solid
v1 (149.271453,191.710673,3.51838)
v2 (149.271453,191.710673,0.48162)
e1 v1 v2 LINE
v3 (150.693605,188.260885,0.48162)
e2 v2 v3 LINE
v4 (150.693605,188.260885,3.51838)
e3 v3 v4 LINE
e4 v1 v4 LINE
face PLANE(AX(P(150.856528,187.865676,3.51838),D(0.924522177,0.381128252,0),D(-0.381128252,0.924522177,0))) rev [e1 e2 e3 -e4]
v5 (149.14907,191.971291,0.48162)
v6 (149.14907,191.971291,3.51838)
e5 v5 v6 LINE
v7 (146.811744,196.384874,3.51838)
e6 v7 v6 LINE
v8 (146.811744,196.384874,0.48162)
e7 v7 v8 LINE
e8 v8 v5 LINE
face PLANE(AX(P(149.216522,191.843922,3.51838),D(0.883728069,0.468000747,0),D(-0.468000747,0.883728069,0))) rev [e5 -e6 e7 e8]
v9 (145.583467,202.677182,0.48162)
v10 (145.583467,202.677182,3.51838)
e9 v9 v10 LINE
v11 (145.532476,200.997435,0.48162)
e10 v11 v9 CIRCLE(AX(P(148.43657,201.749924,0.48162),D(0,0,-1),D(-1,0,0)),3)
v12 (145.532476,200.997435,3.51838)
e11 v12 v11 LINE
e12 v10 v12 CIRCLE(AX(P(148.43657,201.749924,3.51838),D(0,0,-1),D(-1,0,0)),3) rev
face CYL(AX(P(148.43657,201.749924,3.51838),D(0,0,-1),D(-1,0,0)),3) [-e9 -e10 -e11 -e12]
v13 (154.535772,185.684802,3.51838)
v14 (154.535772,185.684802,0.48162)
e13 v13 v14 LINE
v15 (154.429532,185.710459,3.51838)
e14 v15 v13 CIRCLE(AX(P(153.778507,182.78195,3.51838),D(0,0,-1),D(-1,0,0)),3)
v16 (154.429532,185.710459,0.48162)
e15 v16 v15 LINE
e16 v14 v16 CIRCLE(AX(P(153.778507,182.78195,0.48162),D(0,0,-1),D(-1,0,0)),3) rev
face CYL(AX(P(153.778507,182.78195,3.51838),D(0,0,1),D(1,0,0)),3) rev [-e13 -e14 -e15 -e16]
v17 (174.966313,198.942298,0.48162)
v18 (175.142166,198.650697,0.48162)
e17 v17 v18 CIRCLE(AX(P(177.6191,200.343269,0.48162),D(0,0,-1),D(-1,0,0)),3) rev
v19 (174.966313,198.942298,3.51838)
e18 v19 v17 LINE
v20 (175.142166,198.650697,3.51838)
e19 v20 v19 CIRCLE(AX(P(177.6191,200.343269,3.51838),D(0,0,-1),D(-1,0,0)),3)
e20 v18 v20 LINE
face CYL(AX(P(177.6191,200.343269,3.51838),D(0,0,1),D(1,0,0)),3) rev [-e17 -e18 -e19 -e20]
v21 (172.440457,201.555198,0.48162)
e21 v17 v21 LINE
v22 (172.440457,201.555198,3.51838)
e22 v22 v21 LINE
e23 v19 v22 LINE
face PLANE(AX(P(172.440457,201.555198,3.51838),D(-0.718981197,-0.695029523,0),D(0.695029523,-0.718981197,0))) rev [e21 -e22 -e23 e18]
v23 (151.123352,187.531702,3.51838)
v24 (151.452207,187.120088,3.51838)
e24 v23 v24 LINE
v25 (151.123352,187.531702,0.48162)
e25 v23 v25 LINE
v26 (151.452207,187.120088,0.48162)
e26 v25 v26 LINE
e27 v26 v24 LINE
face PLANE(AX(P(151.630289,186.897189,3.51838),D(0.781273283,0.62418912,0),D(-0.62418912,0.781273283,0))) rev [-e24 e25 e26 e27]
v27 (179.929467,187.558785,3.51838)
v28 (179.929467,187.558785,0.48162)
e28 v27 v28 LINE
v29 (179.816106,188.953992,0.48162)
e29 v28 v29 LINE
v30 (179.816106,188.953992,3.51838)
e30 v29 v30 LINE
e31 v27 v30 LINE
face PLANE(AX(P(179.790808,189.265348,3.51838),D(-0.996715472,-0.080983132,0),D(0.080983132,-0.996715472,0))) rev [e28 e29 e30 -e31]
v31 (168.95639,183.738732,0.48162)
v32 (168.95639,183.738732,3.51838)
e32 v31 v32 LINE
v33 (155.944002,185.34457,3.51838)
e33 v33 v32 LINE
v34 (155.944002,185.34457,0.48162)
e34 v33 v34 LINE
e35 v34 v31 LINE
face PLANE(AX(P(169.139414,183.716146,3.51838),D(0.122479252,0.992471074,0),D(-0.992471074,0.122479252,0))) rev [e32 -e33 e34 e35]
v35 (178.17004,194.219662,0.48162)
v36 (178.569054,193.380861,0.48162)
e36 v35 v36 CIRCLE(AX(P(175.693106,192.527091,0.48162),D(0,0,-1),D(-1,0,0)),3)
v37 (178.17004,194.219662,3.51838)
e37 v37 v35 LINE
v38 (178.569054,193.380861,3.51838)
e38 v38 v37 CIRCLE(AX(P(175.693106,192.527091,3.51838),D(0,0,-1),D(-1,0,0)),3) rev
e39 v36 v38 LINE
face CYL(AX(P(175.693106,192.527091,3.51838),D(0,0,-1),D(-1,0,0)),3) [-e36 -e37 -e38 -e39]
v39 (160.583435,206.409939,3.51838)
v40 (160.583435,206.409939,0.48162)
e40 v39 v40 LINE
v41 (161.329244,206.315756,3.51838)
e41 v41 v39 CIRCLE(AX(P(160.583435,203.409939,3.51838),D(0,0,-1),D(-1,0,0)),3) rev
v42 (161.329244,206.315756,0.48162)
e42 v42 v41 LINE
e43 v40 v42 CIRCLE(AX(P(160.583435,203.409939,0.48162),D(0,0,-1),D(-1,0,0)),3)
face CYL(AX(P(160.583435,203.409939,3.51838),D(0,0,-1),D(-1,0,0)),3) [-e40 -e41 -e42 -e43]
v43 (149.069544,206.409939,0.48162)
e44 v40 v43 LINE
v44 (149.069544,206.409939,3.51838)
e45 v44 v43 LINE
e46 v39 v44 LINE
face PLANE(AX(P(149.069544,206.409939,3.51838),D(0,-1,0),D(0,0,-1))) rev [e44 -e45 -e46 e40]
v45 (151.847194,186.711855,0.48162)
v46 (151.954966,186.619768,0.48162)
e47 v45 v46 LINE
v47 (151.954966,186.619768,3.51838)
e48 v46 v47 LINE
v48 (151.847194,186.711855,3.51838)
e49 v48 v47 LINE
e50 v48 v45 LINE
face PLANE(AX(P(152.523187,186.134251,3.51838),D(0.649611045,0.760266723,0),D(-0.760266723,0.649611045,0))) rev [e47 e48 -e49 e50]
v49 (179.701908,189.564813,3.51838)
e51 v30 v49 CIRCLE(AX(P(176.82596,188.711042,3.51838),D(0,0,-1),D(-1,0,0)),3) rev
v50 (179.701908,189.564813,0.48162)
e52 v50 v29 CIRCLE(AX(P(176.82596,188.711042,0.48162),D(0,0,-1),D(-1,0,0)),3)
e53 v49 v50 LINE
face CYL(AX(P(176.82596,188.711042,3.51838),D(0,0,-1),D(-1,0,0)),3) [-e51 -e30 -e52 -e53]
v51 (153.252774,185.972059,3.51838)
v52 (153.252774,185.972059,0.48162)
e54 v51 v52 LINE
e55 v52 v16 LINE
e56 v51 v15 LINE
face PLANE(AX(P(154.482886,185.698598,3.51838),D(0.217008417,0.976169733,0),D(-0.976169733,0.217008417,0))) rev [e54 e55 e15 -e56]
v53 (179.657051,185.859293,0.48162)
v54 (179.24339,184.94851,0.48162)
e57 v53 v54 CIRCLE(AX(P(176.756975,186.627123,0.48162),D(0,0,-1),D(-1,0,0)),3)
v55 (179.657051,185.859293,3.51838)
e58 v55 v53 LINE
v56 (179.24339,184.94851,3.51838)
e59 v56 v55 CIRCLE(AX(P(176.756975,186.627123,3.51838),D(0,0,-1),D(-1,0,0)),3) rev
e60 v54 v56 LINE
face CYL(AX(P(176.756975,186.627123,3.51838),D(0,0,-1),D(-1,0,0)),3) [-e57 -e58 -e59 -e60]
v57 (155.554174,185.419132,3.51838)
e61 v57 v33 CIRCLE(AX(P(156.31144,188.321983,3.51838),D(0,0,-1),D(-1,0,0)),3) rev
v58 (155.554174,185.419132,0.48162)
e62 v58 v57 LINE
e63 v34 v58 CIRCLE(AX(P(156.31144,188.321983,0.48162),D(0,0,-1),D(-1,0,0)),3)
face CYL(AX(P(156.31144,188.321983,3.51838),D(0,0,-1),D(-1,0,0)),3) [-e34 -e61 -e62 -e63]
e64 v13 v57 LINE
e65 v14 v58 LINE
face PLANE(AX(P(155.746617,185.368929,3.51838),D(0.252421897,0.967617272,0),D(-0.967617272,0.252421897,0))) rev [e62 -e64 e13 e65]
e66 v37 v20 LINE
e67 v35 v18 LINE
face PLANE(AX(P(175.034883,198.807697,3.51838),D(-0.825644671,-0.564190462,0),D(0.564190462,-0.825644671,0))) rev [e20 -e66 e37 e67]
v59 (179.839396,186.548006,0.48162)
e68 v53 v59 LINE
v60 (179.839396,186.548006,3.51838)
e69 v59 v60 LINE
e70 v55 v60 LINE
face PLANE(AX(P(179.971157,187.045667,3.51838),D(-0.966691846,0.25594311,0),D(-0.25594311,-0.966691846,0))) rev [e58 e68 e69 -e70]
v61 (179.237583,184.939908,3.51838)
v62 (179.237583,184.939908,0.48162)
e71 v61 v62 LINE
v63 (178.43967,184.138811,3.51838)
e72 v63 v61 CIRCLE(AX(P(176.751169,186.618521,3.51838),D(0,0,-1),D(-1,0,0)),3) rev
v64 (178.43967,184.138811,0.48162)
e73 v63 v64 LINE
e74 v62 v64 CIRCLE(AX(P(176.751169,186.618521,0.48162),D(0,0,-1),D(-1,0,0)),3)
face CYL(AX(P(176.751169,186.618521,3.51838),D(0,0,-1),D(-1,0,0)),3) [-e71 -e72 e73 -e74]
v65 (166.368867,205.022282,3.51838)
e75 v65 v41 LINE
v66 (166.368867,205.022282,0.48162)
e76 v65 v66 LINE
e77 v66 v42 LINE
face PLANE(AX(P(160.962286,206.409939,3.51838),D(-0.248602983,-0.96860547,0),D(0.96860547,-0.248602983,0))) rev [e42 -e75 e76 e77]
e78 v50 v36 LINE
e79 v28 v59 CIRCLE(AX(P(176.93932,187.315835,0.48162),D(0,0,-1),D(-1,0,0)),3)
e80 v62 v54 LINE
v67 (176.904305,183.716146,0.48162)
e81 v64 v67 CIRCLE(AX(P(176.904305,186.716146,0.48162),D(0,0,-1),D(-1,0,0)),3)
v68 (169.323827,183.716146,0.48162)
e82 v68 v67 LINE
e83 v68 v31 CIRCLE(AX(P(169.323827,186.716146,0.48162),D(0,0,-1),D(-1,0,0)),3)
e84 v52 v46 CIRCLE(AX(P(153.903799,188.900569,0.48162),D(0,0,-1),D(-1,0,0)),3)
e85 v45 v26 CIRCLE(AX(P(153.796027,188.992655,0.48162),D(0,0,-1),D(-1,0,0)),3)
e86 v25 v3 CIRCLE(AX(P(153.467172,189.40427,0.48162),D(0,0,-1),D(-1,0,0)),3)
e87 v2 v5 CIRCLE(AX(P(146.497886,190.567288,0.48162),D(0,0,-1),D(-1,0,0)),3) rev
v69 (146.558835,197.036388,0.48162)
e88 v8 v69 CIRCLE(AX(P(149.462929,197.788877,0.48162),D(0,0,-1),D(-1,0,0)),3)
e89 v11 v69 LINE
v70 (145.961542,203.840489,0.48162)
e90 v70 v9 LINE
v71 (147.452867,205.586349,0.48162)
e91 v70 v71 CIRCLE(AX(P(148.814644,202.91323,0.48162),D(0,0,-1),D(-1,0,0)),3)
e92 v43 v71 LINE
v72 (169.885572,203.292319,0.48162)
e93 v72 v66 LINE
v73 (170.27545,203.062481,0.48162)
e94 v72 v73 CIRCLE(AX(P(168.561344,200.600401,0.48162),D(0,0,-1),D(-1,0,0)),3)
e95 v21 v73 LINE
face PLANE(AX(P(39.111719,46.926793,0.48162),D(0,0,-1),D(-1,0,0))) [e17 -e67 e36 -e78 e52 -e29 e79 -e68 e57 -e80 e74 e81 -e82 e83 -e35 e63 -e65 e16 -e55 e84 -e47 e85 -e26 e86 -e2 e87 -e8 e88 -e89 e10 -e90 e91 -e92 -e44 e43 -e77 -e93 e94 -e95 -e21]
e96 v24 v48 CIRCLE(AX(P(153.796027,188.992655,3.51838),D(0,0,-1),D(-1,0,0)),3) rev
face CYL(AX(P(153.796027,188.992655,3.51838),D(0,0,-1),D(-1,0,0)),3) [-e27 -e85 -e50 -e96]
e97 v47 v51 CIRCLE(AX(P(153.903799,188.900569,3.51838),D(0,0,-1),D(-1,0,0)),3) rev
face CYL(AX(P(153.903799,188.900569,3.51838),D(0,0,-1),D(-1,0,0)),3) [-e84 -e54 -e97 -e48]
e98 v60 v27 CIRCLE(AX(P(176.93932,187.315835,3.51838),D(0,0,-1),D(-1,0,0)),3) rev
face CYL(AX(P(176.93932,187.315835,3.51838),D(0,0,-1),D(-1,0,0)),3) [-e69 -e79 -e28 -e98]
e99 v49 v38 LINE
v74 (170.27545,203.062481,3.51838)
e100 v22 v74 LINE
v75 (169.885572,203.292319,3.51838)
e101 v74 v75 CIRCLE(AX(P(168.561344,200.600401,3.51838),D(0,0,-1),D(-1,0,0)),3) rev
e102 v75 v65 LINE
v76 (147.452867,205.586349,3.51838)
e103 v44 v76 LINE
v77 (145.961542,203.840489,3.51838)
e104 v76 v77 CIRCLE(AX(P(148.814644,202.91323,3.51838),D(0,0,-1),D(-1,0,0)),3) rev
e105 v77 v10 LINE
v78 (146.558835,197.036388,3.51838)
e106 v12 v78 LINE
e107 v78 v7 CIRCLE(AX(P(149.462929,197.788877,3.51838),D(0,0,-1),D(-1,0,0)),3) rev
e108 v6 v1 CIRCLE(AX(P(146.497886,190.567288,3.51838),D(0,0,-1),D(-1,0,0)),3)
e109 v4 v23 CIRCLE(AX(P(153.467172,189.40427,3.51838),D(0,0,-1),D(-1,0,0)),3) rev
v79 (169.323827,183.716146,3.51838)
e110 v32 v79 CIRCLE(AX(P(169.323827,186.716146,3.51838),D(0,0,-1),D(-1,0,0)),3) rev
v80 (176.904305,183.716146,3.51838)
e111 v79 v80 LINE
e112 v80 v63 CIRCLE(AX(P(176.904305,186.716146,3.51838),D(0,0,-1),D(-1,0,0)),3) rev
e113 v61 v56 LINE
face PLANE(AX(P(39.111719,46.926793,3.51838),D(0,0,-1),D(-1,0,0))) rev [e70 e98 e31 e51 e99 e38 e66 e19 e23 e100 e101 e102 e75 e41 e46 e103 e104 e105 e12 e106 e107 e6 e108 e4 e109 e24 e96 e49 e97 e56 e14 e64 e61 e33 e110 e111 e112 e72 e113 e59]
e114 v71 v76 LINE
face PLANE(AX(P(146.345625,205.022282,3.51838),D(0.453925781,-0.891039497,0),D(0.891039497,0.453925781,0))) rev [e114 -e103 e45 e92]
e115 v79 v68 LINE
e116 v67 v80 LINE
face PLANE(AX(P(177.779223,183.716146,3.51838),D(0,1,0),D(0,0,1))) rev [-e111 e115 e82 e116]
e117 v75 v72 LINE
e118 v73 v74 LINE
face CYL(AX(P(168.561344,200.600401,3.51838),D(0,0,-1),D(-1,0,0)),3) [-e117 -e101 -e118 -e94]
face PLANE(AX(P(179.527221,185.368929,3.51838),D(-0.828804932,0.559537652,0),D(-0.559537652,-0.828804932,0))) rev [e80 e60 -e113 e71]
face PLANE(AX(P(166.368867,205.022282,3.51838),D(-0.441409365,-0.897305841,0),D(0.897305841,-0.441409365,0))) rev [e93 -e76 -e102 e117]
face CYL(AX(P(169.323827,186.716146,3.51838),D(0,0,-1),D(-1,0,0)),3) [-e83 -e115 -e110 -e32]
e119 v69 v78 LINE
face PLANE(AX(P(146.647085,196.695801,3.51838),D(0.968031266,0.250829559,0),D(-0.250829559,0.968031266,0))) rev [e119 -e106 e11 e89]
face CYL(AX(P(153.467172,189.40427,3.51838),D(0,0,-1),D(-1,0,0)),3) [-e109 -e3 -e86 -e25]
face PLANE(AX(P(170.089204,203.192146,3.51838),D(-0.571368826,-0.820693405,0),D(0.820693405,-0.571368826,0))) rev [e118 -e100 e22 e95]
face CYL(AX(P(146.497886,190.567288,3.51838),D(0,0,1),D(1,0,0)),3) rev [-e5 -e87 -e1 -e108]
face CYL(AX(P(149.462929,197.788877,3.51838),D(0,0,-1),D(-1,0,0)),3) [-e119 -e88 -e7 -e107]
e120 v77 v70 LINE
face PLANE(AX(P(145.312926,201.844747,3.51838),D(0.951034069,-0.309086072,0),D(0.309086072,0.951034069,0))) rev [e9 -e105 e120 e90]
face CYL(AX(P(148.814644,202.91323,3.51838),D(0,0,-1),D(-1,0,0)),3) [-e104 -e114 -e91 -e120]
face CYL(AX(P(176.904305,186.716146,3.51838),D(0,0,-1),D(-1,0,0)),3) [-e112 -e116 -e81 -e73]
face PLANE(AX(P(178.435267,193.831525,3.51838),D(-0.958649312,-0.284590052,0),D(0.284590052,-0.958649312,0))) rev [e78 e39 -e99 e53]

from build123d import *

# Parameters (mm, degrees)
BOSS_EXTRUDE1_DEPTH = 4
SCALE4_SCALE        = 0.75919
FILLET6_R           = 3
FILLET7_R           = 3


with BuildPart() as part:
    # Sketch1 → Boss-Extrude1 (new body)
    with BuildSketch(Plane.XY):
        Polygon((139.887521377, 204.056894723), (141.24778548, 208.242322731), (144.835713473, 210.070135105), (160.500754315, 210.070135105), (167.622266071, 208.242322731), (172.522669487, 205.831679823), (175.619724447, 203.675502319), (178.946764591, 200.233807794), (179.037084843, 200.056512483), (183.5160481, 193.501931379), (185.301557704, 187.487393826), (185.539112291, 184.563645059), (184.954362538, 182.355057305), (184.113784767, 181.109966828), (182.651910383, 180.178021908), (181.232301611, 180.178021908), (171.271612606, 180.178021908), (153.63070922, 182.355057305), (151.966131288, 182.789295026), (149.384829279, 183.363134026), (148.208709289, 184.36807152), (147.189516356, 185.643755739), (145.029311699, 190.88387399), (141.644867129, 197.274737006), align=None)
    extrude(amount=BOSS_EXTRUDE1_DEPTH)


with BuildPart() as part_1:
    # Scale4: scaled about (162.417336375, 194.870616826, 2)
    add(part.part.scale(SCALE4_SCALE).moved(Location((39.111718772, 46.926793238, 0.48162))))

    # Fillet6
    # the kernel refuses this fillet: 3 mm, written as the material it adds along each edge
    with BuildSketch(Plane(origin=(175.034883215, 198.80769695, 0.48162), x_dir=(0.5641904622979087, -0.8256446706980383, 0), z_dir=(0, 0, 1))) as fillet6_piece_1_section:
        with BuildLine():
            CenterArc((FILLET6_R * 0.0642311981219, FILLET6_R), FILLET6_R, 262.649743959, 7.350256041)
            Line((-FILLET6_R * 0.063703385216, FILLET6_R * 0.00821739156901), (0, 0))
            Line((0, 0), (FILLET6_R * 0.0642311981219, 0))
        make_face()
    fillet6_piece_1 = extrude(amount=3.03676, mode=Mode.PRIVATE)
    fillet6_piece_1 = split(fillet6_piece_1, bisect_by=Plane(origin=(175.064317261, 198.840916135, 2), z_dir=(-0.7189811970622167, -0.6950295233088893, 0)), keep=Keep.TOP, mode=Mode.PRIVATE)
    add(fillet6_piece_1)
    with BuildSketch(Plane(origin=(154.482885985, 185.698598128, 0.48162), x_dir=(-0.9761697325769959, 0.21700841734954968, 0), z_dir=(0, 0, 1))) as fillet6_piece_2:
        with BuildLine():
            CenterArc((FILLET6_R * 0.0182188067452, FILLET6_R), FILLET6_R, 267.912509474, 2.087490526)
            Line((-FILLET6_R * 0.0182067162065, FILLET6_R * 0.000663629563253), (0, 0))
            Line((0, 0), (FILLET6_R * 0.0182188067452, 0))
        make_face()
    extrude(amount=3.03676)
    with BuildSketch(Plane(origin=(149.216521921, 191.843921532, 0.48162), x_dir=(-0.4680007470830183, 0.8837280694476876, 0), z_dir=(0, 0, 1))) as fillet6_piece_3:
        with BuildLine():
            CenterArc((FILLET6_R * 0.0480422965927, FILLET6_R), FILLET6_R, 264.498987959, 5.501012041)
            Line((-FILLET6_R * 0.0478210380477, FILLET6_R * 0.00460549475516), (0, 0))
            Line((0, 0), (FILLET6_R * 0.0480422965927, 0))
        make_face()
    extrude(amount=3.03676)
    # the kernel refuses this fillet: 3 mm, written as the material it takes off along each edge
    with BuildSketch(Plane(origin=(170.089204221, 203.192146242, -0.085723646), x_dir=(0.8206934047378623, -0.5713688260832711, 0), z_dir=(0, 0, 1))) as fillet6_2_piece_1:
        with BuildLine():
            CenterArc((FILLET6_R * 0.0756458194575, -FILLET6_R), FILLET6_R, 90, 8.651894609)
            Line((-FILLET6_R * 0.0747850106227, -FILLET6_R * 0.0113794634131), (0, 0))
            Line((0, 0), (FILLET6_R * 0.0756458194575, 0))
        make_face()
    extrude(amount=4.171447292, mode=Mode.SUBTRACT)
    with BuildSketch(Plane(origin=(179.790808366, 189.265347757, -0.299334996), x_dir=(0.08098313210757263, -0.9967154720952452, 0), z_dir=(0, 0, 1))) as fillet6_2_piece_2:
        with BuildLine():
            CenterArc((FILLET6_R * 0.104127332747, -FILLET6_R), FILLET6_R, 90, 11.889267137)
            Line((-FILLET6_R * 0.101893551021, -FILLET6_R * 0.0214524051169), (0, 0))
            Line((0, 0), (FILLET6_R * 0.104127332747, 0))
        make_face()
    extrude(amount=4.598669991, mode=Mode.SUBTRACT)
    with BuildSketch(Plane(origin=(179.527221267, 185.368929193, -0.786529904), x_dir=(-0.5595376521790817, -0.8288049322934323, 0), z_dir=(0, 0, 1))) as fillet6_2_piece_3:
        with BuildLine():
            CenterArc((FILLET6_R * 0.169086653883, -FILLET6_R), FILLET6_R, 90, 19.194353316)
            Line((-FILLET6_R * 0.159686919919, -FILLET6_R * 0.0555912234793), (0, 0))
            Line((0, 0), (FILLET6_R * 0.169086653883, 0))
        make_face()
    extrude(amount=5.573059808, mode=Mode.SUBTRACT)
    with BuildSketch(Plane(origin=(178.435267329, 193.831524522, -0.693636489), x_dir=(0.2845900515763164, -0.9586493115544337, 0), z_dir=(0, 0, 1))) as fillet6_2_piece_4:
        with BuildLine():
            CenterArc((FILLET6_R * 0.156700865162, -FILLET6_R), FILLET6_R, 90, 17.811748872)
            Line((-FILLET6_R * 0.149189673688, -FILLET6_R * 0.0479333120825), (0, 0))
            Line((0, 0), (FILLET6_R * 0.156700865162, 0))
        make_face()
    extrude(amount=5.387272977, mode=Mode.SUBTRACT)
    with BuildSketch(Plane(origin=(178.88906303, 184.423668954, -1.075559702), x_dir=(-0.8432271980573246, -0.5375573387615439, 0), z_dir=(0, 0, 1))) as fillet6_2_piece_5:
        with BuildLine():
            CenterArc((FILLET6_R * 0.207623960269, -FILLET6_R), FILLET6_R, 90, 23.458660046)
            Line((-FILLET6_R * 0.190463329283, -FILLET6_R * 0.0826524595894), (0, 0))
            Line((0, 0), (FILLET6_R * 0.207623960269, 0))
        make_face()
    extrude(amount=6.151119404, mode=Mode.SUBTRACT)
    with BuildSketch(Plane(origin=(169.139414347, 183.71614569, 0.020587263), x_dir=(-0.9924710740045749, 0.12247925238261967, 0), z_dir=(0, 0, 1))) as fillet6_2_piece_6:
        with BuildLine():
            CenterArc((FILLET6_R * 0.0614710316153, -FILLET6_R), FILLET6_R, 90, 7.035208973)
            Line((-FILLET6_R * 0.0610082207674, -FILLET6_R * 0.00752892599542), (0, 0))
            Line((0, 0), (FILLET6_R * 0.0614710316153, 0))
        make_face()
    extrude(amount=3.958825474, mode=Mode.SUBTRACT)
    with BuildSketch(Plane(origin=(155.746616905, 185.368929193, -0.015587097), x_dir=(-0.9676172723968424, 0.2524218971470086, 0), z_dir=(0, 0, 1))) as fillet6_2_piece_7:
        with BuildLine():
            CenterArc((FILLET6_R * 0.0662942795425, -FILLET6_R), FILLET6_R, 90, 7.585665015)
            Line((-FILLET6_R * 0.0657141117056, -FILLET6_R * 0.00875140119136), (0, 0))
            Line((0, 0), (FILLET6_R * 0.0662942795425, 0))
        make_face()
    extrude(amount=4.031174193, mode=Mode.SUBTRACT)
    with BuildSketch(Plane(origin=(150.856527695, 187.865676157, -0.587064111), x_dir=(-0.3811282524443585, 0.9245221766884282, 0), z_dir=(0, 0, 1))) as fillet6_2_piece_8:
        with BuildLine():
            CenterArc((FILLET6_R * 0.14249121477, -FILLET6_R), FILLET6_R, 90, 16.21910898)
            Line((-FILLET6_R * 0.136820147731, -FILLET6_R * 0.0397994153417), (0, 0))
            Line((0, 0), (FILLET6_R * 0.14249121477, 0))
        make_face()
    extrude(amount=5.174128222, mode=Mode.SUBTRACT)
    with BuildSketch(Plane(origin=(151.630288778, 186.897189455, -0.231632642), x_dir=(-0.6241891196597051, 0.7812732831080572, 0), z_dir=(0, 0, 1))) as fillet6_2_piece_9:
        with BuildLine():
            CenterArc((FILLET6_R * 0.0951003522105, -FILLET6_R), FILLET6_R, 90, 10.865021551)
            Line((-FILLET6_R * 0.0933955804828, -FILLET6_R * 0.0179260295894), (0, 0))
            Line((0, 0), (FILLET6_R * 0.0951003522104, 0))
        make_face()
    extrude(amount=4.463265283, mode=Mode.SUBTRACT)
    with BuildSketch(Plane(origin=(152.523187313, 186.134250959, -1.386873198), x_dir=(-0.7602667232190712, 0.6496110448304708, 0), z_dir=(0, 0, 1))) as fillet6_2_piece_10:
        with BuildLine():
            CenterArc((FILLET6_R * 0.249132426376, -FILLET6_R), FILLET6_R, 90, 27.978899274)
            Line((-FILLET6_R * 0.220013935166, -FILLET6_R * 0.116879571377), (0, 0))
            Line((0, 0), (FILLET6_R * 0.249132426376, 0))
        make_face()
    extrude(amount=6.773746396, mode=Mode.SUBTRACT)
    with BuildSketch(Plane(origin=(177.779222616, 183.71614569, -1.705674136), x_dir=(-1, 0, 0), z_dir=(0, 0, 1))) as fillet6_2_piece_11:
        with BuildLine():
            CenterArc((FILLET6_R * 0.291639218067, -FILLET6_R), FILLET6_R, 90, 32.517510615)
            Line((-FILLET6_R * 0.245918120694, -FILLET6_R * 0.156772801943), (0, 0))
            Line((0, 0), (FILLET6_R * 0.291639218067, 0))
        make_face()
    extrude(amount=7.411348271, mode=Mode.SUBTRACT)
    with BuildSketch(Plane(origin=(146.647085448, 196.695800825, -0.397967253), x_dir=(0.4680007470830723, -0.8837280694476589, 0), z_dir=(0, 0, 1))) as fillet6_2_piece_12:
        with BuildLine():
            CenterArc((FILLET6_R * 0.117278300393, FILLET6_R), FILLET6_R, 256.622007888, 13.377992112)
            Line((-FILLET6_R * 0.114095932972, FILLET6_R * 0.027135176844), (0, 0))
            Line((0, 0), (FILLET6_R * 0.117278300394, 0))
        make_face()
    extrude(amount=4.795934506, mode=Mode.SUBTRACT)

    # Fillet7
    fillet7_edges = [part_1.edges().sort_by_distance(p)[0] for p in [
        (145.312926127, 201.844747143, 2),
        (146.345625031, 205.022282232, 2),
        (160.962286441, 206.409939108, 2),
        (179.971157433, 187.04566693, 2),
    ]]
    fillet(fillet7_edges, radius=FILLET7_R)


solid = part_1.part
